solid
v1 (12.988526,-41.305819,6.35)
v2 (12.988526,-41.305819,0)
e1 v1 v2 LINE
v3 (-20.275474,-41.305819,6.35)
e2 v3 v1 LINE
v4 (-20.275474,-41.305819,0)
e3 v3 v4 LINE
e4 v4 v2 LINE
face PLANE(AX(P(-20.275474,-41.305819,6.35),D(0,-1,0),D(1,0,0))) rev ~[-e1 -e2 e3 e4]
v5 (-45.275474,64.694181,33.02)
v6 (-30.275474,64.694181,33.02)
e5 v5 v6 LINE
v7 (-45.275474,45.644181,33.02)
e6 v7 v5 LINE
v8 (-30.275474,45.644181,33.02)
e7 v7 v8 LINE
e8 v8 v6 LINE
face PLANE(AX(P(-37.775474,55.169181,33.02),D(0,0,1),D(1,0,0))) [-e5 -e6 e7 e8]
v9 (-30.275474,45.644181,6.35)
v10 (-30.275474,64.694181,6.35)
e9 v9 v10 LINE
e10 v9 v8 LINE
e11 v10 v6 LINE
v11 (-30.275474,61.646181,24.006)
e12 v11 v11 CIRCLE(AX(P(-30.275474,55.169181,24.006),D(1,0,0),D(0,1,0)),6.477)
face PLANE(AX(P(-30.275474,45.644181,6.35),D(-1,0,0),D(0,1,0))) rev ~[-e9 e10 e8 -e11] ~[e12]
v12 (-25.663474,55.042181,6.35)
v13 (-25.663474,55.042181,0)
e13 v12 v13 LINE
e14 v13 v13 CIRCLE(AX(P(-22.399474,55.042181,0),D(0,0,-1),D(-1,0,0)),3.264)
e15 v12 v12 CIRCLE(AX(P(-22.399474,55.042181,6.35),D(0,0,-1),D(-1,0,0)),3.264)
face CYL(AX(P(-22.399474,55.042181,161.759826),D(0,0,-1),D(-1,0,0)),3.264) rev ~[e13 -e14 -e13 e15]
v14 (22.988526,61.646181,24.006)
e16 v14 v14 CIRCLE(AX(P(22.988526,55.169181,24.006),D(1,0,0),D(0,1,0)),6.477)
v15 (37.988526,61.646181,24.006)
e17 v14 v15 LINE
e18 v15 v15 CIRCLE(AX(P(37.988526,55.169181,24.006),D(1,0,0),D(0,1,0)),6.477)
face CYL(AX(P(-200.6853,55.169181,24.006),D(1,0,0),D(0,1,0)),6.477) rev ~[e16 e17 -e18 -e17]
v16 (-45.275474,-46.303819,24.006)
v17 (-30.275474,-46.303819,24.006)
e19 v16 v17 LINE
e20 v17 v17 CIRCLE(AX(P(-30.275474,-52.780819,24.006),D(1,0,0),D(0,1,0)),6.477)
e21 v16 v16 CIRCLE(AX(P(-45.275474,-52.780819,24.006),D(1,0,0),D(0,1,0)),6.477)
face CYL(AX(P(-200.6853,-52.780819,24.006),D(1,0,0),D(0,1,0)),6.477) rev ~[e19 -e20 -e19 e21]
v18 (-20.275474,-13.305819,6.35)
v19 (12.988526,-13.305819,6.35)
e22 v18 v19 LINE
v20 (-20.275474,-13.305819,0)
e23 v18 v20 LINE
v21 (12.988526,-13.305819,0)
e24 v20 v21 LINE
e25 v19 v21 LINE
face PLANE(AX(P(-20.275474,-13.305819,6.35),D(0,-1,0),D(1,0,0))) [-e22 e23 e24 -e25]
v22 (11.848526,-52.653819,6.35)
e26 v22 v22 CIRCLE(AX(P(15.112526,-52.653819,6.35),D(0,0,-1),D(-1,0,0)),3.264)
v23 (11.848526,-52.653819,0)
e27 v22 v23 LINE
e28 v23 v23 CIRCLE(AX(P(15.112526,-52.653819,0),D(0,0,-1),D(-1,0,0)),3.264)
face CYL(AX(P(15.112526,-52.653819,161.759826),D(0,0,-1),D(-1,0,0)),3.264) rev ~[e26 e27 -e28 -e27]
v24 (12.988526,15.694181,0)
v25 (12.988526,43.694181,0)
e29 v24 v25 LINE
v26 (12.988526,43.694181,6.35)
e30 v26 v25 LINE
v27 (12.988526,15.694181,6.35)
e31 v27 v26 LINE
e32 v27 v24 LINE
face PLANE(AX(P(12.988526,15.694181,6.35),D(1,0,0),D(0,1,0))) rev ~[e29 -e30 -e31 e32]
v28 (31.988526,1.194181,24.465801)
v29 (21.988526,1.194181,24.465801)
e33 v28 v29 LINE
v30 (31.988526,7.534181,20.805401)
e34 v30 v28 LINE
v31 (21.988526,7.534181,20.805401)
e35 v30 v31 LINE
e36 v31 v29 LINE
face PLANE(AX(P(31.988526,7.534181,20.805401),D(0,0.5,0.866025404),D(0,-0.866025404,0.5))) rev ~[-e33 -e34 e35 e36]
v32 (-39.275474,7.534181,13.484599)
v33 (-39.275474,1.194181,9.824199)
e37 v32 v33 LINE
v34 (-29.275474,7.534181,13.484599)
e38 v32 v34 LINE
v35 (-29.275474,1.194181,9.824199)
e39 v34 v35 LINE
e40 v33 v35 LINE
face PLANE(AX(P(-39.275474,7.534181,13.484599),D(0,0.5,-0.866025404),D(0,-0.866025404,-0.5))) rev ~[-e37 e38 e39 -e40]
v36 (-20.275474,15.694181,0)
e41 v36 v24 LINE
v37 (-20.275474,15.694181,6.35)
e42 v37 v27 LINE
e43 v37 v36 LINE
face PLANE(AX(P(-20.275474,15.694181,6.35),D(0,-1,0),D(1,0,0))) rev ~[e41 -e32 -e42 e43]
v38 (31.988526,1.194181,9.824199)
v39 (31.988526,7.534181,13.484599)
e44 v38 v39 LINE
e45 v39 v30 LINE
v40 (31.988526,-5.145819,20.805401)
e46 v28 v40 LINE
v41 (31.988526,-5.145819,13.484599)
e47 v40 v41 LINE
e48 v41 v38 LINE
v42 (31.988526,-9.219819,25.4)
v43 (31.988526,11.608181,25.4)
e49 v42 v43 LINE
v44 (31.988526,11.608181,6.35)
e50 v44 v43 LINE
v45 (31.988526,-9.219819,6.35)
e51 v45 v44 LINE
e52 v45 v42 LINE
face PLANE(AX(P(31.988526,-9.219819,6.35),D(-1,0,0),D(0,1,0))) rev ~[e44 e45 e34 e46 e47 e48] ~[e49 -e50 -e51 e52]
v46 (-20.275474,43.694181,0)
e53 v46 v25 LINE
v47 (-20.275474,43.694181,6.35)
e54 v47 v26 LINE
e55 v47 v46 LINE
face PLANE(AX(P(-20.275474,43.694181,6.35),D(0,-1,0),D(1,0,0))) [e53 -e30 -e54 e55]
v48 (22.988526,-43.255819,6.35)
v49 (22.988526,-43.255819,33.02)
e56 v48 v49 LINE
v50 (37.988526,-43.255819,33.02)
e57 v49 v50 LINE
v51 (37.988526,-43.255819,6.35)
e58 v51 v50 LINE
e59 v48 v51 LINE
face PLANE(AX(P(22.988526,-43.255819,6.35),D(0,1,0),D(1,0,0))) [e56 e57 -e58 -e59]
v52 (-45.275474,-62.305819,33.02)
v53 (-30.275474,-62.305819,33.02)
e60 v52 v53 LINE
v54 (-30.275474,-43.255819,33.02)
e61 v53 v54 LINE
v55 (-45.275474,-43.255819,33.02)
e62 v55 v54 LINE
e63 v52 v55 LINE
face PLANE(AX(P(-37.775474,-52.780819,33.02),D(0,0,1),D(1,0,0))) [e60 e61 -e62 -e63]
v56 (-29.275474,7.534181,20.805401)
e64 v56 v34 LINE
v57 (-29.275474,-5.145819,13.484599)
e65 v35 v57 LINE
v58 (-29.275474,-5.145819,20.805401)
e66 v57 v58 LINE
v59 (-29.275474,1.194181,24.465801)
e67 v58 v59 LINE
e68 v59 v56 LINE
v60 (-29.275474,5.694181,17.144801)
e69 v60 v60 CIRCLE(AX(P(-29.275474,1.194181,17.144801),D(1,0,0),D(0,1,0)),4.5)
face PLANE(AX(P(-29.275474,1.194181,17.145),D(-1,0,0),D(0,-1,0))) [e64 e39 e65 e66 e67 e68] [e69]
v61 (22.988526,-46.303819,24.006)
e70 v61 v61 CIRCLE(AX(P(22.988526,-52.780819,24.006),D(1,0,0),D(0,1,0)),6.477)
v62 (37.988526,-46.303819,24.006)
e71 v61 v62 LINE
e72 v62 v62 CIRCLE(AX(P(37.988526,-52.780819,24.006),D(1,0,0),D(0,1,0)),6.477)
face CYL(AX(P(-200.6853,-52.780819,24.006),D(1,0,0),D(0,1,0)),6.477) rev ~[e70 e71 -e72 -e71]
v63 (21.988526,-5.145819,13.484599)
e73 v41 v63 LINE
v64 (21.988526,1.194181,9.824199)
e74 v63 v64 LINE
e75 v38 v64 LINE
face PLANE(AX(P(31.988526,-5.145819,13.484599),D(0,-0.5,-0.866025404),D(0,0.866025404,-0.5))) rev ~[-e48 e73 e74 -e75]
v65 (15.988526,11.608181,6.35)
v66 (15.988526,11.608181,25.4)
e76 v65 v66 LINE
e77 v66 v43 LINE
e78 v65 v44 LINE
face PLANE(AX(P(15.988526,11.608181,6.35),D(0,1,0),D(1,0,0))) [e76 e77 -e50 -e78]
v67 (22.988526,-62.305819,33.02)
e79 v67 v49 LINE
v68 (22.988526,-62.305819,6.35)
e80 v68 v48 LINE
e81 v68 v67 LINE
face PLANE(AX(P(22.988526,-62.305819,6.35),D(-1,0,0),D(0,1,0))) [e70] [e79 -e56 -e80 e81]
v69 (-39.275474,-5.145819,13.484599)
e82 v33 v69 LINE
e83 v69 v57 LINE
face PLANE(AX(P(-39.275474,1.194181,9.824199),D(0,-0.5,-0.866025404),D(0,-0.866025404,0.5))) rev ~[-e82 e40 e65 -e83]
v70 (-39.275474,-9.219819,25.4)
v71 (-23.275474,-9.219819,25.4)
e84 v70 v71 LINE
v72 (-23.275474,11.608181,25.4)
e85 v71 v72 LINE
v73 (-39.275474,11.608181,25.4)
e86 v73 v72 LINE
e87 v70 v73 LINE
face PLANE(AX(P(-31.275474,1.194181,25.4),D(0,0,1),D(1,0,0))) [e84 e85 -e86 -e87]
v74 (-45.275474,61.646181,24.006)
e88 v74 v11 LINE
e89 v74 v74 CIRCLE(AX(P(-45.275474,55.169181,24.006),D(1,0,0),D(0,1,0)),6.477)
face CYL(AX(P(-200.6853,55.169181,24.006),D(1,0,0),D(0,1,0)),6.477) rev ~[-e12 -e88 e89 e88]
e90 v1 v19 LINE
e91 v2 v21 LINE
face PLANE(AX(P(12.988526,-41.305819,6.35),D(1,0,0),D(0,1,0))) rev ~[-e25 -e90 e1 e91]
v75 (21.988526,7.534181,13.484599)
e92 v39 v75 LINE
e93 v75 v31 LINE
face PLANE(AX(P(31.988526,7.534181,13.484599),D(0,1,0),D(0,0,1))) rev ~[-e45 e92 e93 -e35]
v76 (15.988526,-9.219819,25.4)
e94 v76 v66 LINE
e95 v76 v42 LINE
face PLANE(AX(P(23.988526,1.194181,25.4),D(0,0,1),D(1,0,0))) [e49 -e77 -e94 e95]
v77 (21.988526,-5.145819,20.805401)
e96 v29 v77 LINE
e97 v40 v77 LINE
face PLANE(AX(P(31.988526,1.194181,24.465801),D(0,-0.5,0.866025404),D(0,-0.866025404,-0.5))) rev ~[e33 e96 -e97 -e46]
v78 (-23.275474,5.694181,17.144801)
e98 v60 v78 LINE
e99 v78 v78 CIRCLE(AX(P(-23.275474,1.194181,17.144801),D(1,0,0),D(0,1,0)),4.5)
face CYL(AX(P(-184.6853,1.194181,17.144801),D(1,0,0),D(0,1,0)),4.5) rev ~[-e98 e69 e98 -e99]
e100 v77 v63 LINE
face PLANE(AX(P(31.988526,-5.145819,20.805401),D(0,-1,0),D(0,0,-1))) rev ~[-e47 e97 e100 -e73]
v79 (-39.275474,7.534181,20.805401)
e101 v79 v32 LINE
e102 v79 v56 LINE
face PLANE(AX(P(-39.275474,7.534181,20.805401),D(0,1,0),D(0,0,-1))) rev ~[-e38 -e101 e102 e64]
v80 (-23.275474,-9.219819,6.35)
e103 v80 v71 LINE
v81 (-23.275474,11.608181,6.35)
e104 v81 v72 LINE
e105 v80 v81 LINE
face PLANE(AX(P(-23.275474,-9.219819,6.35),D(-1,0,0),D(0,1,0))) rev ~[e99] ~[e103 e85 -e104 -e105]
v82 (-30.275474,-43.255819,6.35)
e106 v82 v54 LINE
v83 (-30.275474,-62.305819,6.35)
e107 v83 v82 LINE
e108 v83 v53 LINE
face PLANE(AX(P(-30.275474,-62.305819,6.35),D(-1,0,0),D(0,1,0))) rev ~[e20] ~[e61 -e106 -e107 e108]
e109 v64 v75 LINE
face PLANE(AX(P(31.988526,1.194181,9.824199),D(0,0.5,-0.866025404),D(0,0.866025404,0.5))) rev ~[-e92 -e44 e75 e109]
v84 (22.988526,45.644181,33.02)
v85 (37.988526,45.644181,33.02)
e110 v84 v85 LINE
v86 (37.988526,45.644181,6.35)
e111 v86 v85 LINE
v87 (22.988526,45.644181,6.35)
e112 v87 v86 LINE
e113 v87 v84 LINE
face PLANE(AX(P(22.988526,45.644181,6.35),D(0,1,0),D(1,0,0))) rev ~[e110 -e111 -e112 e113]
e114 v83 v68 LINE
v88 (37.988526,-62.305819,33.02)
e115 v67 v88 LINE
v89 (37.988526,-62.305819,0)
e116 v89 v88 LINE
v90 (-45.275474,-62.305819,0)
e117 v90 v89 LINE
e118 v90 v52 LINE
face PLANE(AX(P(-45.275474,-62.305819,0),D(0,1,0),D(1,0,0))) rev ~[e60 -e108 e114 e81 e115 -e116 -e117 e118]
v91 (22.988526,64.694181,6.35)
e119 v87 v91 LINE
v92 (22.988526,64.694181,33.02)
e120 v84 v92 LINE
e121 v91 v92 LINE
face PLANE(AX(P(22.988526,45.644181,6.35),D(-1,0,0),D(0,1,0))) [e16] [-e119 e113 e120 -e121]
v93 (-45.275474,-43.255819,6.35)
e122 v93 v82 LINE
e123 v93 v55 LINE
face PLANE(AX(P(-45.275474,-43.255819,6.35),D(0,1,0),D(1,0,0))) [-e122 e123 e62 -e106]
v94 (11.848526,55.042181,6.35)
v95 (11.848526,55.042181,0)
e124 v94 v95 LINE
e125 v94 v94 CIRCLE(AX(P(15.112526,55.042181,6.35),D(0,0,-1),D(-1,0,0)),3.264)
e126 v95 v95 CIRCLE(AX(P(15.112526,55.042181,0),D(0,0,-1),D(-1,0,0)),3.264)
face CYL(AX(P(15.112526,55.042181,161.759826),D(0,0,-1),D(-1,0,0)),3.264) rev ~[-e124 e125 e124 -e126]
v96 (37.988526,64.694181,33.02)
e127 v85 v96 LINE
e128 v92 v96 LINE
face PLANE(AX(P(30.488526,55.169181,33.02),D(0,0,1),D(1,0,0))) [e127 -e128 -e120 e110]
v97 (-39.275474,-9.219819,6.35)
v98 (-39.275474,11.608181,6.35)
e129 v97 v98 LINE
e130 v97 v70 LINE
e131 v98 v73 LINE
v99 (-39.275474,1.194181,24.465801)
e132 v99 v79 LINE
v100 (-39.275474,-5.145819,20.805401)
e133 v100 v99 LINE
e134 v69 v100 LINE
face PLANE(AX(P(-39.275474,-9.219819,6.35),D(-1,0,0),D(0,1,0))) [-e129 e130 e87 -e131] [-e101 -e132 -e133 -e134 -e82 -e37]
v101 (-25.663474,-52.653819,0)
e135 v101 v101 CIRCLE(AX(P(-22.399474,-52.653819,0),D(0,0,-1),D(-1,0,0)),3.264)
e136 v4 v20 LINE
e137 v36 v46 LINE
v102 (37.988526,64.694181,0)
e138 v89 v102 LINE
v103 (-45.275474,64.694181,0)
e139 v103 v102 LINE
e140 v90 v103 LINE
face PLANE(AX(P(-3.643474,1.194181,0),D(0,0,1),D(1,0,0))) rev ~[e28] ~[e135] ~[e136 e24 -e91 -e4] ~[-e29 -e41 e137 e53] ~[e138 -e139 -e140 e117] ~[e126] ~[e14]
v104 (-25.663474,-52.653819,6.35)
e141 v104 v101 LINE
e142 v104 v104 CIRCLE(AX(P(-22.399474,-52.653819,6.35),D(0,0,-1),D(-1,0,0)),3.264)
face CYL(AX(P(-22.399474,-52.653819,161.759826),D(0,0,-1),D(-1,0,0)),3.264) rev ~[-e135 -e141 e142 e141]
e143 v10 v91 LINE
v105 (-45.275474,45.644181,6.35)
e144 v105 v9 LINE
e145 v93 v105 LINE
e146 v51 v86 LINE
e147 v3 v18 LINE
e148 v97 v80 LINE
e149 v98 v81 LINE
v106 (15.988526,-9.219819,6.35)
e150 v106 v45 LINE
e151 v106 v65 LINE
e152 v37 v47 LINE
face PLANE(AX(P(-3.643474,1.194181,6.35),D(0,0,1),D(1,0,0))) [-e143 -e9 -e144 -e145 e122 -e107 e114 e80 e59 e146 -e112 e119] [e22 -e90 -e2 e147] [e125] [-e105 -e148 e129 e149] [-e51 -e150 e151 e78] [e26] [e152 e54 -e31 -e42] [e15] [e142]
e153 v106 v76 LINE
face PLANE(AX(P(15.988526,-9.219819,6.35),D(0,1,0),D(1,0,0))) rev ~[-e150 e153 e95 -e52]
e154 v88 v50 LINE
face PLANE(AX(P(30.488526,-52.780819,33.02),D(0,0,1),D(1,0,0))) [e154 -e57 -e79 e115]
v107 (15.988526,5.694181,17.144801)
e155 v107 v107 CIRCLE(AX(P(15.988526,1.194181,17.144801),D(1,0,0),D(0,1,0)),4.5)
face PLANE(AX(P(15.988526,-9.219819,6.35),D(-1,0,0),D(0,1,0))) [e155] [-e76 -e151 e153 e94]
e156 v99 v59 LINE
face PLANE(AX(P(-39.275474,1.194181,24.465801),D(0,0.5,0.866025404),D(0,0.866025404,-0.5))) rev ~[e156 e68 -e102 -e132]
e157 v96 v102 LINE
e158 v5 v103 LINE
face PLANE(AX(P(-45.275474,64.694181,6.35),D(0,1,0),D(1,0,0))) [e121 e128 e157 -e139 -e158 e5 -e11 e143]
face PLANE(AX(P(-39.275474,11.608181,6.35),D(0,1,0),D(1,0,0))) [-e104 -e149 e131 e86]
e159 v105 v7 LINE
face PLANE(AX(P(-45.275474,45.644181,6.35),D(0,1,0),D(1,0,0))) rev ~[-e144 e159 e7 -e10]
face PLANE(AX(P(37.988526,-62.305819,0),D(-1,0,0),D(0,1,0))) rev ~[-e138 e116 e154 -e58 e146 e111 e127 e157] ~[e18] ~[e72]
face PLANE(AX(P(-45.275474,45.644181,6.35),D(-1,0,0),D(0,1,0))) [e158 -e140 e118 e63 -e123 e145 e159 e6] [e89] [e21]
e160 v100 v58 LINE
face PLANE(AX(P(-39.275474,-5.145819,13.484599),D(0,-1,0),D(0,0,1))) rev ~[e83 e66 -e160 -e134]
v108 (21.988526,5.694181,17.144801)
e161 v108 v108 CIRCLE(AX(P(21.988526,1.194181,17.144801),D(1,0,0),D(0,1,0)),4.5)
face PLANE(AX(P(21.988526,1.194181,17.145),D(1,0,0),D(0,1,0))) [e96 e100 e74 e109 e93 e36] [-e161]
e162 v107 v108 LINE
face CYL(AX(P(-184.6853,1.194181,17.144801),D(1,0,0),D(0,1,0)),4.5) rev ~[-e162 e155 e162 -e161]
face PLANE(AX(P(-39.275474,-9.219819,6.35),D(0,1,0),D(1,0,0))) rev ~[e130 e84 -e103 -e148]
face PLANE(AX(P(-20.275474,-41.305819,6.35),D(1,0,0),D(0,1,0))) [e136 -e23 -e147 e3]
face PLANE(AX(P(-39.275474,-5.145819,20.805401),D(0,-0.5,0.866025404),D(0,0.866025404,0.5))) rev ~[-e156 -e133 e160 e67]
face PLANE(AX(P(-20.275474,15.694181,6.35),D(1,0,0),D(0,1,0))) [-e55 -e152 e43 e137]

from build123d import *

# Parameters (mm, degrees)
F0_W      = 83.264
F0_H      = 127
F1_DEPTH  = 6.35
F2_W      = 15
F2_H      = 19.05
F3_DEPTH  = 26.67
F5_D      = 12.954
F7_D      = 6.528
F8_W      = 16
F8_H      = 20.828
F9_DEPTH  = 19.05
F11_DEPTH = 10
F13_DEPTH = 10
F15_D     = 9
F16_W     = 33.264
F16_H     = 28
F17_DEPTH = 6.351


# Not quite as in the source:
# - a feature names something its author has since deleted; it is built from what else it names


with BuildPart() as f1:
    # F0 (on Top) → F1 (new body)
    with BuildSketch(Plane.XY):
        with Locations((-3.6434741511, 1.1941809207)):
            Rectangle(F0_W, F0_H)
    extrude(amount=F1_DEPTH)

    # F2 (on face) → F3 (join)
    with BuildSketch(Plane.XY.offset(6.35)):
        with Locations((-37.7754741511, 55.1691809207)):
            Rectangle(F2_W, F2_H)
        with Locations((30.4885258489, 55.1691809207)):
            Rectangle(F2_W, F2_H)
        with Locations((30.4885258489, -52.7808190793)):
            Rectangle(F2_W, F2_H)
        with Locations((-37.7754741511, -52.7808190793)):
            Rectangle(F2_W, F2_H)
    extrude(amount=F3_DEPTH)

    # F5 (through all)
    with Locations(Plane(origin=(-45.2754741511, 0, 0), x_dir=(0, -1, 0), z_dir=(-1, 0, 0))):
        with Locations((-55.1691809207, 24.006), (52.7808190793, 24.006)):
            Hole(F5_D / 2)

    # F7 (through all)
    with Locations(Plane.XY.offset(6.35)):
        with Locations((-22.3994741511, 55.0421809207), (15.1125258489, 55.0421809207), (-22.3994741511, -52.6538190793), (15.1125258489, -52.6538190793)):
            Hole(F7_D / 2)

    # F8 (on face) → F9 (join)
    with BuildSketch(Plane.XY.offset(6.35)):
        with Locations((-31.2754741511, 1.1941809207)):
            Rectangle(F8_W, F8_H)
        with Locations((23.9885258489, 1.1941809207)):
            Rectangle(F8_W, F8_H)
    extrude(amount=F9_DEPTH)

    # F10 (on face) → F11 (cut)
    with BuildSketch(Plane(origin=(-39.2754741511, 0, 0), x_dir=(0, -1, 0), z_dir=(-1, 0, 0))):
        Polygon((5.1458190793, 13.4845992933), (5.1458190793, 20.8054007067), (-1.1941809207, 24.4658014133), (-7.5341809207, 20.8054007067), (-7.5341809207, 13.4845992933), (-1.1941809207, 9.8241985867), align=None)
    extrude(amount=-F11_DEPTH, mode=Mode.SUBTRACT)

    # F12 (on face) → F13 (cut)
    with BuildSketch(Plane.YZ.offset(31.9885258489)):
        Polygon((7.5341809207, 13.4845992933), (7.5341809207, 20.8054007067), (1.1941809207, 24.4658014133), (-5.1458190793, 20.8054007067), (-5.1458190793, 13.4845992933), (1.1941809207, 9.8241985867), align=None)
    extrude(amount=-F13_DEPTH, mode=Mode.SUBTRACT)

    # F15 (through all)
    with Locations(Plane(origin=(-29.2754741511, 0, 0), x_dir=(0, -1, 0), z_dir=(-1, 0, 0))):
        with Locations((-1.1941809207, 17.1448014133)):
            Hole(F15_D / 2)

    # F16 (on face) → F17 (cut, through all)
    with BuildSketch(Plane.XY.offset(6.35)):
        with Locations((-3.6434741511, 29.6941809207)):
            Rectangle(F16_W, F16_H)
        with Locations((-3.6434741511, -27.3058190793)):
            Rectangle(F16_W, F16_H)
    extrude(amount=-F17_DEPTH, mode=Mode.SUBTRACT)


solid = f1.part
